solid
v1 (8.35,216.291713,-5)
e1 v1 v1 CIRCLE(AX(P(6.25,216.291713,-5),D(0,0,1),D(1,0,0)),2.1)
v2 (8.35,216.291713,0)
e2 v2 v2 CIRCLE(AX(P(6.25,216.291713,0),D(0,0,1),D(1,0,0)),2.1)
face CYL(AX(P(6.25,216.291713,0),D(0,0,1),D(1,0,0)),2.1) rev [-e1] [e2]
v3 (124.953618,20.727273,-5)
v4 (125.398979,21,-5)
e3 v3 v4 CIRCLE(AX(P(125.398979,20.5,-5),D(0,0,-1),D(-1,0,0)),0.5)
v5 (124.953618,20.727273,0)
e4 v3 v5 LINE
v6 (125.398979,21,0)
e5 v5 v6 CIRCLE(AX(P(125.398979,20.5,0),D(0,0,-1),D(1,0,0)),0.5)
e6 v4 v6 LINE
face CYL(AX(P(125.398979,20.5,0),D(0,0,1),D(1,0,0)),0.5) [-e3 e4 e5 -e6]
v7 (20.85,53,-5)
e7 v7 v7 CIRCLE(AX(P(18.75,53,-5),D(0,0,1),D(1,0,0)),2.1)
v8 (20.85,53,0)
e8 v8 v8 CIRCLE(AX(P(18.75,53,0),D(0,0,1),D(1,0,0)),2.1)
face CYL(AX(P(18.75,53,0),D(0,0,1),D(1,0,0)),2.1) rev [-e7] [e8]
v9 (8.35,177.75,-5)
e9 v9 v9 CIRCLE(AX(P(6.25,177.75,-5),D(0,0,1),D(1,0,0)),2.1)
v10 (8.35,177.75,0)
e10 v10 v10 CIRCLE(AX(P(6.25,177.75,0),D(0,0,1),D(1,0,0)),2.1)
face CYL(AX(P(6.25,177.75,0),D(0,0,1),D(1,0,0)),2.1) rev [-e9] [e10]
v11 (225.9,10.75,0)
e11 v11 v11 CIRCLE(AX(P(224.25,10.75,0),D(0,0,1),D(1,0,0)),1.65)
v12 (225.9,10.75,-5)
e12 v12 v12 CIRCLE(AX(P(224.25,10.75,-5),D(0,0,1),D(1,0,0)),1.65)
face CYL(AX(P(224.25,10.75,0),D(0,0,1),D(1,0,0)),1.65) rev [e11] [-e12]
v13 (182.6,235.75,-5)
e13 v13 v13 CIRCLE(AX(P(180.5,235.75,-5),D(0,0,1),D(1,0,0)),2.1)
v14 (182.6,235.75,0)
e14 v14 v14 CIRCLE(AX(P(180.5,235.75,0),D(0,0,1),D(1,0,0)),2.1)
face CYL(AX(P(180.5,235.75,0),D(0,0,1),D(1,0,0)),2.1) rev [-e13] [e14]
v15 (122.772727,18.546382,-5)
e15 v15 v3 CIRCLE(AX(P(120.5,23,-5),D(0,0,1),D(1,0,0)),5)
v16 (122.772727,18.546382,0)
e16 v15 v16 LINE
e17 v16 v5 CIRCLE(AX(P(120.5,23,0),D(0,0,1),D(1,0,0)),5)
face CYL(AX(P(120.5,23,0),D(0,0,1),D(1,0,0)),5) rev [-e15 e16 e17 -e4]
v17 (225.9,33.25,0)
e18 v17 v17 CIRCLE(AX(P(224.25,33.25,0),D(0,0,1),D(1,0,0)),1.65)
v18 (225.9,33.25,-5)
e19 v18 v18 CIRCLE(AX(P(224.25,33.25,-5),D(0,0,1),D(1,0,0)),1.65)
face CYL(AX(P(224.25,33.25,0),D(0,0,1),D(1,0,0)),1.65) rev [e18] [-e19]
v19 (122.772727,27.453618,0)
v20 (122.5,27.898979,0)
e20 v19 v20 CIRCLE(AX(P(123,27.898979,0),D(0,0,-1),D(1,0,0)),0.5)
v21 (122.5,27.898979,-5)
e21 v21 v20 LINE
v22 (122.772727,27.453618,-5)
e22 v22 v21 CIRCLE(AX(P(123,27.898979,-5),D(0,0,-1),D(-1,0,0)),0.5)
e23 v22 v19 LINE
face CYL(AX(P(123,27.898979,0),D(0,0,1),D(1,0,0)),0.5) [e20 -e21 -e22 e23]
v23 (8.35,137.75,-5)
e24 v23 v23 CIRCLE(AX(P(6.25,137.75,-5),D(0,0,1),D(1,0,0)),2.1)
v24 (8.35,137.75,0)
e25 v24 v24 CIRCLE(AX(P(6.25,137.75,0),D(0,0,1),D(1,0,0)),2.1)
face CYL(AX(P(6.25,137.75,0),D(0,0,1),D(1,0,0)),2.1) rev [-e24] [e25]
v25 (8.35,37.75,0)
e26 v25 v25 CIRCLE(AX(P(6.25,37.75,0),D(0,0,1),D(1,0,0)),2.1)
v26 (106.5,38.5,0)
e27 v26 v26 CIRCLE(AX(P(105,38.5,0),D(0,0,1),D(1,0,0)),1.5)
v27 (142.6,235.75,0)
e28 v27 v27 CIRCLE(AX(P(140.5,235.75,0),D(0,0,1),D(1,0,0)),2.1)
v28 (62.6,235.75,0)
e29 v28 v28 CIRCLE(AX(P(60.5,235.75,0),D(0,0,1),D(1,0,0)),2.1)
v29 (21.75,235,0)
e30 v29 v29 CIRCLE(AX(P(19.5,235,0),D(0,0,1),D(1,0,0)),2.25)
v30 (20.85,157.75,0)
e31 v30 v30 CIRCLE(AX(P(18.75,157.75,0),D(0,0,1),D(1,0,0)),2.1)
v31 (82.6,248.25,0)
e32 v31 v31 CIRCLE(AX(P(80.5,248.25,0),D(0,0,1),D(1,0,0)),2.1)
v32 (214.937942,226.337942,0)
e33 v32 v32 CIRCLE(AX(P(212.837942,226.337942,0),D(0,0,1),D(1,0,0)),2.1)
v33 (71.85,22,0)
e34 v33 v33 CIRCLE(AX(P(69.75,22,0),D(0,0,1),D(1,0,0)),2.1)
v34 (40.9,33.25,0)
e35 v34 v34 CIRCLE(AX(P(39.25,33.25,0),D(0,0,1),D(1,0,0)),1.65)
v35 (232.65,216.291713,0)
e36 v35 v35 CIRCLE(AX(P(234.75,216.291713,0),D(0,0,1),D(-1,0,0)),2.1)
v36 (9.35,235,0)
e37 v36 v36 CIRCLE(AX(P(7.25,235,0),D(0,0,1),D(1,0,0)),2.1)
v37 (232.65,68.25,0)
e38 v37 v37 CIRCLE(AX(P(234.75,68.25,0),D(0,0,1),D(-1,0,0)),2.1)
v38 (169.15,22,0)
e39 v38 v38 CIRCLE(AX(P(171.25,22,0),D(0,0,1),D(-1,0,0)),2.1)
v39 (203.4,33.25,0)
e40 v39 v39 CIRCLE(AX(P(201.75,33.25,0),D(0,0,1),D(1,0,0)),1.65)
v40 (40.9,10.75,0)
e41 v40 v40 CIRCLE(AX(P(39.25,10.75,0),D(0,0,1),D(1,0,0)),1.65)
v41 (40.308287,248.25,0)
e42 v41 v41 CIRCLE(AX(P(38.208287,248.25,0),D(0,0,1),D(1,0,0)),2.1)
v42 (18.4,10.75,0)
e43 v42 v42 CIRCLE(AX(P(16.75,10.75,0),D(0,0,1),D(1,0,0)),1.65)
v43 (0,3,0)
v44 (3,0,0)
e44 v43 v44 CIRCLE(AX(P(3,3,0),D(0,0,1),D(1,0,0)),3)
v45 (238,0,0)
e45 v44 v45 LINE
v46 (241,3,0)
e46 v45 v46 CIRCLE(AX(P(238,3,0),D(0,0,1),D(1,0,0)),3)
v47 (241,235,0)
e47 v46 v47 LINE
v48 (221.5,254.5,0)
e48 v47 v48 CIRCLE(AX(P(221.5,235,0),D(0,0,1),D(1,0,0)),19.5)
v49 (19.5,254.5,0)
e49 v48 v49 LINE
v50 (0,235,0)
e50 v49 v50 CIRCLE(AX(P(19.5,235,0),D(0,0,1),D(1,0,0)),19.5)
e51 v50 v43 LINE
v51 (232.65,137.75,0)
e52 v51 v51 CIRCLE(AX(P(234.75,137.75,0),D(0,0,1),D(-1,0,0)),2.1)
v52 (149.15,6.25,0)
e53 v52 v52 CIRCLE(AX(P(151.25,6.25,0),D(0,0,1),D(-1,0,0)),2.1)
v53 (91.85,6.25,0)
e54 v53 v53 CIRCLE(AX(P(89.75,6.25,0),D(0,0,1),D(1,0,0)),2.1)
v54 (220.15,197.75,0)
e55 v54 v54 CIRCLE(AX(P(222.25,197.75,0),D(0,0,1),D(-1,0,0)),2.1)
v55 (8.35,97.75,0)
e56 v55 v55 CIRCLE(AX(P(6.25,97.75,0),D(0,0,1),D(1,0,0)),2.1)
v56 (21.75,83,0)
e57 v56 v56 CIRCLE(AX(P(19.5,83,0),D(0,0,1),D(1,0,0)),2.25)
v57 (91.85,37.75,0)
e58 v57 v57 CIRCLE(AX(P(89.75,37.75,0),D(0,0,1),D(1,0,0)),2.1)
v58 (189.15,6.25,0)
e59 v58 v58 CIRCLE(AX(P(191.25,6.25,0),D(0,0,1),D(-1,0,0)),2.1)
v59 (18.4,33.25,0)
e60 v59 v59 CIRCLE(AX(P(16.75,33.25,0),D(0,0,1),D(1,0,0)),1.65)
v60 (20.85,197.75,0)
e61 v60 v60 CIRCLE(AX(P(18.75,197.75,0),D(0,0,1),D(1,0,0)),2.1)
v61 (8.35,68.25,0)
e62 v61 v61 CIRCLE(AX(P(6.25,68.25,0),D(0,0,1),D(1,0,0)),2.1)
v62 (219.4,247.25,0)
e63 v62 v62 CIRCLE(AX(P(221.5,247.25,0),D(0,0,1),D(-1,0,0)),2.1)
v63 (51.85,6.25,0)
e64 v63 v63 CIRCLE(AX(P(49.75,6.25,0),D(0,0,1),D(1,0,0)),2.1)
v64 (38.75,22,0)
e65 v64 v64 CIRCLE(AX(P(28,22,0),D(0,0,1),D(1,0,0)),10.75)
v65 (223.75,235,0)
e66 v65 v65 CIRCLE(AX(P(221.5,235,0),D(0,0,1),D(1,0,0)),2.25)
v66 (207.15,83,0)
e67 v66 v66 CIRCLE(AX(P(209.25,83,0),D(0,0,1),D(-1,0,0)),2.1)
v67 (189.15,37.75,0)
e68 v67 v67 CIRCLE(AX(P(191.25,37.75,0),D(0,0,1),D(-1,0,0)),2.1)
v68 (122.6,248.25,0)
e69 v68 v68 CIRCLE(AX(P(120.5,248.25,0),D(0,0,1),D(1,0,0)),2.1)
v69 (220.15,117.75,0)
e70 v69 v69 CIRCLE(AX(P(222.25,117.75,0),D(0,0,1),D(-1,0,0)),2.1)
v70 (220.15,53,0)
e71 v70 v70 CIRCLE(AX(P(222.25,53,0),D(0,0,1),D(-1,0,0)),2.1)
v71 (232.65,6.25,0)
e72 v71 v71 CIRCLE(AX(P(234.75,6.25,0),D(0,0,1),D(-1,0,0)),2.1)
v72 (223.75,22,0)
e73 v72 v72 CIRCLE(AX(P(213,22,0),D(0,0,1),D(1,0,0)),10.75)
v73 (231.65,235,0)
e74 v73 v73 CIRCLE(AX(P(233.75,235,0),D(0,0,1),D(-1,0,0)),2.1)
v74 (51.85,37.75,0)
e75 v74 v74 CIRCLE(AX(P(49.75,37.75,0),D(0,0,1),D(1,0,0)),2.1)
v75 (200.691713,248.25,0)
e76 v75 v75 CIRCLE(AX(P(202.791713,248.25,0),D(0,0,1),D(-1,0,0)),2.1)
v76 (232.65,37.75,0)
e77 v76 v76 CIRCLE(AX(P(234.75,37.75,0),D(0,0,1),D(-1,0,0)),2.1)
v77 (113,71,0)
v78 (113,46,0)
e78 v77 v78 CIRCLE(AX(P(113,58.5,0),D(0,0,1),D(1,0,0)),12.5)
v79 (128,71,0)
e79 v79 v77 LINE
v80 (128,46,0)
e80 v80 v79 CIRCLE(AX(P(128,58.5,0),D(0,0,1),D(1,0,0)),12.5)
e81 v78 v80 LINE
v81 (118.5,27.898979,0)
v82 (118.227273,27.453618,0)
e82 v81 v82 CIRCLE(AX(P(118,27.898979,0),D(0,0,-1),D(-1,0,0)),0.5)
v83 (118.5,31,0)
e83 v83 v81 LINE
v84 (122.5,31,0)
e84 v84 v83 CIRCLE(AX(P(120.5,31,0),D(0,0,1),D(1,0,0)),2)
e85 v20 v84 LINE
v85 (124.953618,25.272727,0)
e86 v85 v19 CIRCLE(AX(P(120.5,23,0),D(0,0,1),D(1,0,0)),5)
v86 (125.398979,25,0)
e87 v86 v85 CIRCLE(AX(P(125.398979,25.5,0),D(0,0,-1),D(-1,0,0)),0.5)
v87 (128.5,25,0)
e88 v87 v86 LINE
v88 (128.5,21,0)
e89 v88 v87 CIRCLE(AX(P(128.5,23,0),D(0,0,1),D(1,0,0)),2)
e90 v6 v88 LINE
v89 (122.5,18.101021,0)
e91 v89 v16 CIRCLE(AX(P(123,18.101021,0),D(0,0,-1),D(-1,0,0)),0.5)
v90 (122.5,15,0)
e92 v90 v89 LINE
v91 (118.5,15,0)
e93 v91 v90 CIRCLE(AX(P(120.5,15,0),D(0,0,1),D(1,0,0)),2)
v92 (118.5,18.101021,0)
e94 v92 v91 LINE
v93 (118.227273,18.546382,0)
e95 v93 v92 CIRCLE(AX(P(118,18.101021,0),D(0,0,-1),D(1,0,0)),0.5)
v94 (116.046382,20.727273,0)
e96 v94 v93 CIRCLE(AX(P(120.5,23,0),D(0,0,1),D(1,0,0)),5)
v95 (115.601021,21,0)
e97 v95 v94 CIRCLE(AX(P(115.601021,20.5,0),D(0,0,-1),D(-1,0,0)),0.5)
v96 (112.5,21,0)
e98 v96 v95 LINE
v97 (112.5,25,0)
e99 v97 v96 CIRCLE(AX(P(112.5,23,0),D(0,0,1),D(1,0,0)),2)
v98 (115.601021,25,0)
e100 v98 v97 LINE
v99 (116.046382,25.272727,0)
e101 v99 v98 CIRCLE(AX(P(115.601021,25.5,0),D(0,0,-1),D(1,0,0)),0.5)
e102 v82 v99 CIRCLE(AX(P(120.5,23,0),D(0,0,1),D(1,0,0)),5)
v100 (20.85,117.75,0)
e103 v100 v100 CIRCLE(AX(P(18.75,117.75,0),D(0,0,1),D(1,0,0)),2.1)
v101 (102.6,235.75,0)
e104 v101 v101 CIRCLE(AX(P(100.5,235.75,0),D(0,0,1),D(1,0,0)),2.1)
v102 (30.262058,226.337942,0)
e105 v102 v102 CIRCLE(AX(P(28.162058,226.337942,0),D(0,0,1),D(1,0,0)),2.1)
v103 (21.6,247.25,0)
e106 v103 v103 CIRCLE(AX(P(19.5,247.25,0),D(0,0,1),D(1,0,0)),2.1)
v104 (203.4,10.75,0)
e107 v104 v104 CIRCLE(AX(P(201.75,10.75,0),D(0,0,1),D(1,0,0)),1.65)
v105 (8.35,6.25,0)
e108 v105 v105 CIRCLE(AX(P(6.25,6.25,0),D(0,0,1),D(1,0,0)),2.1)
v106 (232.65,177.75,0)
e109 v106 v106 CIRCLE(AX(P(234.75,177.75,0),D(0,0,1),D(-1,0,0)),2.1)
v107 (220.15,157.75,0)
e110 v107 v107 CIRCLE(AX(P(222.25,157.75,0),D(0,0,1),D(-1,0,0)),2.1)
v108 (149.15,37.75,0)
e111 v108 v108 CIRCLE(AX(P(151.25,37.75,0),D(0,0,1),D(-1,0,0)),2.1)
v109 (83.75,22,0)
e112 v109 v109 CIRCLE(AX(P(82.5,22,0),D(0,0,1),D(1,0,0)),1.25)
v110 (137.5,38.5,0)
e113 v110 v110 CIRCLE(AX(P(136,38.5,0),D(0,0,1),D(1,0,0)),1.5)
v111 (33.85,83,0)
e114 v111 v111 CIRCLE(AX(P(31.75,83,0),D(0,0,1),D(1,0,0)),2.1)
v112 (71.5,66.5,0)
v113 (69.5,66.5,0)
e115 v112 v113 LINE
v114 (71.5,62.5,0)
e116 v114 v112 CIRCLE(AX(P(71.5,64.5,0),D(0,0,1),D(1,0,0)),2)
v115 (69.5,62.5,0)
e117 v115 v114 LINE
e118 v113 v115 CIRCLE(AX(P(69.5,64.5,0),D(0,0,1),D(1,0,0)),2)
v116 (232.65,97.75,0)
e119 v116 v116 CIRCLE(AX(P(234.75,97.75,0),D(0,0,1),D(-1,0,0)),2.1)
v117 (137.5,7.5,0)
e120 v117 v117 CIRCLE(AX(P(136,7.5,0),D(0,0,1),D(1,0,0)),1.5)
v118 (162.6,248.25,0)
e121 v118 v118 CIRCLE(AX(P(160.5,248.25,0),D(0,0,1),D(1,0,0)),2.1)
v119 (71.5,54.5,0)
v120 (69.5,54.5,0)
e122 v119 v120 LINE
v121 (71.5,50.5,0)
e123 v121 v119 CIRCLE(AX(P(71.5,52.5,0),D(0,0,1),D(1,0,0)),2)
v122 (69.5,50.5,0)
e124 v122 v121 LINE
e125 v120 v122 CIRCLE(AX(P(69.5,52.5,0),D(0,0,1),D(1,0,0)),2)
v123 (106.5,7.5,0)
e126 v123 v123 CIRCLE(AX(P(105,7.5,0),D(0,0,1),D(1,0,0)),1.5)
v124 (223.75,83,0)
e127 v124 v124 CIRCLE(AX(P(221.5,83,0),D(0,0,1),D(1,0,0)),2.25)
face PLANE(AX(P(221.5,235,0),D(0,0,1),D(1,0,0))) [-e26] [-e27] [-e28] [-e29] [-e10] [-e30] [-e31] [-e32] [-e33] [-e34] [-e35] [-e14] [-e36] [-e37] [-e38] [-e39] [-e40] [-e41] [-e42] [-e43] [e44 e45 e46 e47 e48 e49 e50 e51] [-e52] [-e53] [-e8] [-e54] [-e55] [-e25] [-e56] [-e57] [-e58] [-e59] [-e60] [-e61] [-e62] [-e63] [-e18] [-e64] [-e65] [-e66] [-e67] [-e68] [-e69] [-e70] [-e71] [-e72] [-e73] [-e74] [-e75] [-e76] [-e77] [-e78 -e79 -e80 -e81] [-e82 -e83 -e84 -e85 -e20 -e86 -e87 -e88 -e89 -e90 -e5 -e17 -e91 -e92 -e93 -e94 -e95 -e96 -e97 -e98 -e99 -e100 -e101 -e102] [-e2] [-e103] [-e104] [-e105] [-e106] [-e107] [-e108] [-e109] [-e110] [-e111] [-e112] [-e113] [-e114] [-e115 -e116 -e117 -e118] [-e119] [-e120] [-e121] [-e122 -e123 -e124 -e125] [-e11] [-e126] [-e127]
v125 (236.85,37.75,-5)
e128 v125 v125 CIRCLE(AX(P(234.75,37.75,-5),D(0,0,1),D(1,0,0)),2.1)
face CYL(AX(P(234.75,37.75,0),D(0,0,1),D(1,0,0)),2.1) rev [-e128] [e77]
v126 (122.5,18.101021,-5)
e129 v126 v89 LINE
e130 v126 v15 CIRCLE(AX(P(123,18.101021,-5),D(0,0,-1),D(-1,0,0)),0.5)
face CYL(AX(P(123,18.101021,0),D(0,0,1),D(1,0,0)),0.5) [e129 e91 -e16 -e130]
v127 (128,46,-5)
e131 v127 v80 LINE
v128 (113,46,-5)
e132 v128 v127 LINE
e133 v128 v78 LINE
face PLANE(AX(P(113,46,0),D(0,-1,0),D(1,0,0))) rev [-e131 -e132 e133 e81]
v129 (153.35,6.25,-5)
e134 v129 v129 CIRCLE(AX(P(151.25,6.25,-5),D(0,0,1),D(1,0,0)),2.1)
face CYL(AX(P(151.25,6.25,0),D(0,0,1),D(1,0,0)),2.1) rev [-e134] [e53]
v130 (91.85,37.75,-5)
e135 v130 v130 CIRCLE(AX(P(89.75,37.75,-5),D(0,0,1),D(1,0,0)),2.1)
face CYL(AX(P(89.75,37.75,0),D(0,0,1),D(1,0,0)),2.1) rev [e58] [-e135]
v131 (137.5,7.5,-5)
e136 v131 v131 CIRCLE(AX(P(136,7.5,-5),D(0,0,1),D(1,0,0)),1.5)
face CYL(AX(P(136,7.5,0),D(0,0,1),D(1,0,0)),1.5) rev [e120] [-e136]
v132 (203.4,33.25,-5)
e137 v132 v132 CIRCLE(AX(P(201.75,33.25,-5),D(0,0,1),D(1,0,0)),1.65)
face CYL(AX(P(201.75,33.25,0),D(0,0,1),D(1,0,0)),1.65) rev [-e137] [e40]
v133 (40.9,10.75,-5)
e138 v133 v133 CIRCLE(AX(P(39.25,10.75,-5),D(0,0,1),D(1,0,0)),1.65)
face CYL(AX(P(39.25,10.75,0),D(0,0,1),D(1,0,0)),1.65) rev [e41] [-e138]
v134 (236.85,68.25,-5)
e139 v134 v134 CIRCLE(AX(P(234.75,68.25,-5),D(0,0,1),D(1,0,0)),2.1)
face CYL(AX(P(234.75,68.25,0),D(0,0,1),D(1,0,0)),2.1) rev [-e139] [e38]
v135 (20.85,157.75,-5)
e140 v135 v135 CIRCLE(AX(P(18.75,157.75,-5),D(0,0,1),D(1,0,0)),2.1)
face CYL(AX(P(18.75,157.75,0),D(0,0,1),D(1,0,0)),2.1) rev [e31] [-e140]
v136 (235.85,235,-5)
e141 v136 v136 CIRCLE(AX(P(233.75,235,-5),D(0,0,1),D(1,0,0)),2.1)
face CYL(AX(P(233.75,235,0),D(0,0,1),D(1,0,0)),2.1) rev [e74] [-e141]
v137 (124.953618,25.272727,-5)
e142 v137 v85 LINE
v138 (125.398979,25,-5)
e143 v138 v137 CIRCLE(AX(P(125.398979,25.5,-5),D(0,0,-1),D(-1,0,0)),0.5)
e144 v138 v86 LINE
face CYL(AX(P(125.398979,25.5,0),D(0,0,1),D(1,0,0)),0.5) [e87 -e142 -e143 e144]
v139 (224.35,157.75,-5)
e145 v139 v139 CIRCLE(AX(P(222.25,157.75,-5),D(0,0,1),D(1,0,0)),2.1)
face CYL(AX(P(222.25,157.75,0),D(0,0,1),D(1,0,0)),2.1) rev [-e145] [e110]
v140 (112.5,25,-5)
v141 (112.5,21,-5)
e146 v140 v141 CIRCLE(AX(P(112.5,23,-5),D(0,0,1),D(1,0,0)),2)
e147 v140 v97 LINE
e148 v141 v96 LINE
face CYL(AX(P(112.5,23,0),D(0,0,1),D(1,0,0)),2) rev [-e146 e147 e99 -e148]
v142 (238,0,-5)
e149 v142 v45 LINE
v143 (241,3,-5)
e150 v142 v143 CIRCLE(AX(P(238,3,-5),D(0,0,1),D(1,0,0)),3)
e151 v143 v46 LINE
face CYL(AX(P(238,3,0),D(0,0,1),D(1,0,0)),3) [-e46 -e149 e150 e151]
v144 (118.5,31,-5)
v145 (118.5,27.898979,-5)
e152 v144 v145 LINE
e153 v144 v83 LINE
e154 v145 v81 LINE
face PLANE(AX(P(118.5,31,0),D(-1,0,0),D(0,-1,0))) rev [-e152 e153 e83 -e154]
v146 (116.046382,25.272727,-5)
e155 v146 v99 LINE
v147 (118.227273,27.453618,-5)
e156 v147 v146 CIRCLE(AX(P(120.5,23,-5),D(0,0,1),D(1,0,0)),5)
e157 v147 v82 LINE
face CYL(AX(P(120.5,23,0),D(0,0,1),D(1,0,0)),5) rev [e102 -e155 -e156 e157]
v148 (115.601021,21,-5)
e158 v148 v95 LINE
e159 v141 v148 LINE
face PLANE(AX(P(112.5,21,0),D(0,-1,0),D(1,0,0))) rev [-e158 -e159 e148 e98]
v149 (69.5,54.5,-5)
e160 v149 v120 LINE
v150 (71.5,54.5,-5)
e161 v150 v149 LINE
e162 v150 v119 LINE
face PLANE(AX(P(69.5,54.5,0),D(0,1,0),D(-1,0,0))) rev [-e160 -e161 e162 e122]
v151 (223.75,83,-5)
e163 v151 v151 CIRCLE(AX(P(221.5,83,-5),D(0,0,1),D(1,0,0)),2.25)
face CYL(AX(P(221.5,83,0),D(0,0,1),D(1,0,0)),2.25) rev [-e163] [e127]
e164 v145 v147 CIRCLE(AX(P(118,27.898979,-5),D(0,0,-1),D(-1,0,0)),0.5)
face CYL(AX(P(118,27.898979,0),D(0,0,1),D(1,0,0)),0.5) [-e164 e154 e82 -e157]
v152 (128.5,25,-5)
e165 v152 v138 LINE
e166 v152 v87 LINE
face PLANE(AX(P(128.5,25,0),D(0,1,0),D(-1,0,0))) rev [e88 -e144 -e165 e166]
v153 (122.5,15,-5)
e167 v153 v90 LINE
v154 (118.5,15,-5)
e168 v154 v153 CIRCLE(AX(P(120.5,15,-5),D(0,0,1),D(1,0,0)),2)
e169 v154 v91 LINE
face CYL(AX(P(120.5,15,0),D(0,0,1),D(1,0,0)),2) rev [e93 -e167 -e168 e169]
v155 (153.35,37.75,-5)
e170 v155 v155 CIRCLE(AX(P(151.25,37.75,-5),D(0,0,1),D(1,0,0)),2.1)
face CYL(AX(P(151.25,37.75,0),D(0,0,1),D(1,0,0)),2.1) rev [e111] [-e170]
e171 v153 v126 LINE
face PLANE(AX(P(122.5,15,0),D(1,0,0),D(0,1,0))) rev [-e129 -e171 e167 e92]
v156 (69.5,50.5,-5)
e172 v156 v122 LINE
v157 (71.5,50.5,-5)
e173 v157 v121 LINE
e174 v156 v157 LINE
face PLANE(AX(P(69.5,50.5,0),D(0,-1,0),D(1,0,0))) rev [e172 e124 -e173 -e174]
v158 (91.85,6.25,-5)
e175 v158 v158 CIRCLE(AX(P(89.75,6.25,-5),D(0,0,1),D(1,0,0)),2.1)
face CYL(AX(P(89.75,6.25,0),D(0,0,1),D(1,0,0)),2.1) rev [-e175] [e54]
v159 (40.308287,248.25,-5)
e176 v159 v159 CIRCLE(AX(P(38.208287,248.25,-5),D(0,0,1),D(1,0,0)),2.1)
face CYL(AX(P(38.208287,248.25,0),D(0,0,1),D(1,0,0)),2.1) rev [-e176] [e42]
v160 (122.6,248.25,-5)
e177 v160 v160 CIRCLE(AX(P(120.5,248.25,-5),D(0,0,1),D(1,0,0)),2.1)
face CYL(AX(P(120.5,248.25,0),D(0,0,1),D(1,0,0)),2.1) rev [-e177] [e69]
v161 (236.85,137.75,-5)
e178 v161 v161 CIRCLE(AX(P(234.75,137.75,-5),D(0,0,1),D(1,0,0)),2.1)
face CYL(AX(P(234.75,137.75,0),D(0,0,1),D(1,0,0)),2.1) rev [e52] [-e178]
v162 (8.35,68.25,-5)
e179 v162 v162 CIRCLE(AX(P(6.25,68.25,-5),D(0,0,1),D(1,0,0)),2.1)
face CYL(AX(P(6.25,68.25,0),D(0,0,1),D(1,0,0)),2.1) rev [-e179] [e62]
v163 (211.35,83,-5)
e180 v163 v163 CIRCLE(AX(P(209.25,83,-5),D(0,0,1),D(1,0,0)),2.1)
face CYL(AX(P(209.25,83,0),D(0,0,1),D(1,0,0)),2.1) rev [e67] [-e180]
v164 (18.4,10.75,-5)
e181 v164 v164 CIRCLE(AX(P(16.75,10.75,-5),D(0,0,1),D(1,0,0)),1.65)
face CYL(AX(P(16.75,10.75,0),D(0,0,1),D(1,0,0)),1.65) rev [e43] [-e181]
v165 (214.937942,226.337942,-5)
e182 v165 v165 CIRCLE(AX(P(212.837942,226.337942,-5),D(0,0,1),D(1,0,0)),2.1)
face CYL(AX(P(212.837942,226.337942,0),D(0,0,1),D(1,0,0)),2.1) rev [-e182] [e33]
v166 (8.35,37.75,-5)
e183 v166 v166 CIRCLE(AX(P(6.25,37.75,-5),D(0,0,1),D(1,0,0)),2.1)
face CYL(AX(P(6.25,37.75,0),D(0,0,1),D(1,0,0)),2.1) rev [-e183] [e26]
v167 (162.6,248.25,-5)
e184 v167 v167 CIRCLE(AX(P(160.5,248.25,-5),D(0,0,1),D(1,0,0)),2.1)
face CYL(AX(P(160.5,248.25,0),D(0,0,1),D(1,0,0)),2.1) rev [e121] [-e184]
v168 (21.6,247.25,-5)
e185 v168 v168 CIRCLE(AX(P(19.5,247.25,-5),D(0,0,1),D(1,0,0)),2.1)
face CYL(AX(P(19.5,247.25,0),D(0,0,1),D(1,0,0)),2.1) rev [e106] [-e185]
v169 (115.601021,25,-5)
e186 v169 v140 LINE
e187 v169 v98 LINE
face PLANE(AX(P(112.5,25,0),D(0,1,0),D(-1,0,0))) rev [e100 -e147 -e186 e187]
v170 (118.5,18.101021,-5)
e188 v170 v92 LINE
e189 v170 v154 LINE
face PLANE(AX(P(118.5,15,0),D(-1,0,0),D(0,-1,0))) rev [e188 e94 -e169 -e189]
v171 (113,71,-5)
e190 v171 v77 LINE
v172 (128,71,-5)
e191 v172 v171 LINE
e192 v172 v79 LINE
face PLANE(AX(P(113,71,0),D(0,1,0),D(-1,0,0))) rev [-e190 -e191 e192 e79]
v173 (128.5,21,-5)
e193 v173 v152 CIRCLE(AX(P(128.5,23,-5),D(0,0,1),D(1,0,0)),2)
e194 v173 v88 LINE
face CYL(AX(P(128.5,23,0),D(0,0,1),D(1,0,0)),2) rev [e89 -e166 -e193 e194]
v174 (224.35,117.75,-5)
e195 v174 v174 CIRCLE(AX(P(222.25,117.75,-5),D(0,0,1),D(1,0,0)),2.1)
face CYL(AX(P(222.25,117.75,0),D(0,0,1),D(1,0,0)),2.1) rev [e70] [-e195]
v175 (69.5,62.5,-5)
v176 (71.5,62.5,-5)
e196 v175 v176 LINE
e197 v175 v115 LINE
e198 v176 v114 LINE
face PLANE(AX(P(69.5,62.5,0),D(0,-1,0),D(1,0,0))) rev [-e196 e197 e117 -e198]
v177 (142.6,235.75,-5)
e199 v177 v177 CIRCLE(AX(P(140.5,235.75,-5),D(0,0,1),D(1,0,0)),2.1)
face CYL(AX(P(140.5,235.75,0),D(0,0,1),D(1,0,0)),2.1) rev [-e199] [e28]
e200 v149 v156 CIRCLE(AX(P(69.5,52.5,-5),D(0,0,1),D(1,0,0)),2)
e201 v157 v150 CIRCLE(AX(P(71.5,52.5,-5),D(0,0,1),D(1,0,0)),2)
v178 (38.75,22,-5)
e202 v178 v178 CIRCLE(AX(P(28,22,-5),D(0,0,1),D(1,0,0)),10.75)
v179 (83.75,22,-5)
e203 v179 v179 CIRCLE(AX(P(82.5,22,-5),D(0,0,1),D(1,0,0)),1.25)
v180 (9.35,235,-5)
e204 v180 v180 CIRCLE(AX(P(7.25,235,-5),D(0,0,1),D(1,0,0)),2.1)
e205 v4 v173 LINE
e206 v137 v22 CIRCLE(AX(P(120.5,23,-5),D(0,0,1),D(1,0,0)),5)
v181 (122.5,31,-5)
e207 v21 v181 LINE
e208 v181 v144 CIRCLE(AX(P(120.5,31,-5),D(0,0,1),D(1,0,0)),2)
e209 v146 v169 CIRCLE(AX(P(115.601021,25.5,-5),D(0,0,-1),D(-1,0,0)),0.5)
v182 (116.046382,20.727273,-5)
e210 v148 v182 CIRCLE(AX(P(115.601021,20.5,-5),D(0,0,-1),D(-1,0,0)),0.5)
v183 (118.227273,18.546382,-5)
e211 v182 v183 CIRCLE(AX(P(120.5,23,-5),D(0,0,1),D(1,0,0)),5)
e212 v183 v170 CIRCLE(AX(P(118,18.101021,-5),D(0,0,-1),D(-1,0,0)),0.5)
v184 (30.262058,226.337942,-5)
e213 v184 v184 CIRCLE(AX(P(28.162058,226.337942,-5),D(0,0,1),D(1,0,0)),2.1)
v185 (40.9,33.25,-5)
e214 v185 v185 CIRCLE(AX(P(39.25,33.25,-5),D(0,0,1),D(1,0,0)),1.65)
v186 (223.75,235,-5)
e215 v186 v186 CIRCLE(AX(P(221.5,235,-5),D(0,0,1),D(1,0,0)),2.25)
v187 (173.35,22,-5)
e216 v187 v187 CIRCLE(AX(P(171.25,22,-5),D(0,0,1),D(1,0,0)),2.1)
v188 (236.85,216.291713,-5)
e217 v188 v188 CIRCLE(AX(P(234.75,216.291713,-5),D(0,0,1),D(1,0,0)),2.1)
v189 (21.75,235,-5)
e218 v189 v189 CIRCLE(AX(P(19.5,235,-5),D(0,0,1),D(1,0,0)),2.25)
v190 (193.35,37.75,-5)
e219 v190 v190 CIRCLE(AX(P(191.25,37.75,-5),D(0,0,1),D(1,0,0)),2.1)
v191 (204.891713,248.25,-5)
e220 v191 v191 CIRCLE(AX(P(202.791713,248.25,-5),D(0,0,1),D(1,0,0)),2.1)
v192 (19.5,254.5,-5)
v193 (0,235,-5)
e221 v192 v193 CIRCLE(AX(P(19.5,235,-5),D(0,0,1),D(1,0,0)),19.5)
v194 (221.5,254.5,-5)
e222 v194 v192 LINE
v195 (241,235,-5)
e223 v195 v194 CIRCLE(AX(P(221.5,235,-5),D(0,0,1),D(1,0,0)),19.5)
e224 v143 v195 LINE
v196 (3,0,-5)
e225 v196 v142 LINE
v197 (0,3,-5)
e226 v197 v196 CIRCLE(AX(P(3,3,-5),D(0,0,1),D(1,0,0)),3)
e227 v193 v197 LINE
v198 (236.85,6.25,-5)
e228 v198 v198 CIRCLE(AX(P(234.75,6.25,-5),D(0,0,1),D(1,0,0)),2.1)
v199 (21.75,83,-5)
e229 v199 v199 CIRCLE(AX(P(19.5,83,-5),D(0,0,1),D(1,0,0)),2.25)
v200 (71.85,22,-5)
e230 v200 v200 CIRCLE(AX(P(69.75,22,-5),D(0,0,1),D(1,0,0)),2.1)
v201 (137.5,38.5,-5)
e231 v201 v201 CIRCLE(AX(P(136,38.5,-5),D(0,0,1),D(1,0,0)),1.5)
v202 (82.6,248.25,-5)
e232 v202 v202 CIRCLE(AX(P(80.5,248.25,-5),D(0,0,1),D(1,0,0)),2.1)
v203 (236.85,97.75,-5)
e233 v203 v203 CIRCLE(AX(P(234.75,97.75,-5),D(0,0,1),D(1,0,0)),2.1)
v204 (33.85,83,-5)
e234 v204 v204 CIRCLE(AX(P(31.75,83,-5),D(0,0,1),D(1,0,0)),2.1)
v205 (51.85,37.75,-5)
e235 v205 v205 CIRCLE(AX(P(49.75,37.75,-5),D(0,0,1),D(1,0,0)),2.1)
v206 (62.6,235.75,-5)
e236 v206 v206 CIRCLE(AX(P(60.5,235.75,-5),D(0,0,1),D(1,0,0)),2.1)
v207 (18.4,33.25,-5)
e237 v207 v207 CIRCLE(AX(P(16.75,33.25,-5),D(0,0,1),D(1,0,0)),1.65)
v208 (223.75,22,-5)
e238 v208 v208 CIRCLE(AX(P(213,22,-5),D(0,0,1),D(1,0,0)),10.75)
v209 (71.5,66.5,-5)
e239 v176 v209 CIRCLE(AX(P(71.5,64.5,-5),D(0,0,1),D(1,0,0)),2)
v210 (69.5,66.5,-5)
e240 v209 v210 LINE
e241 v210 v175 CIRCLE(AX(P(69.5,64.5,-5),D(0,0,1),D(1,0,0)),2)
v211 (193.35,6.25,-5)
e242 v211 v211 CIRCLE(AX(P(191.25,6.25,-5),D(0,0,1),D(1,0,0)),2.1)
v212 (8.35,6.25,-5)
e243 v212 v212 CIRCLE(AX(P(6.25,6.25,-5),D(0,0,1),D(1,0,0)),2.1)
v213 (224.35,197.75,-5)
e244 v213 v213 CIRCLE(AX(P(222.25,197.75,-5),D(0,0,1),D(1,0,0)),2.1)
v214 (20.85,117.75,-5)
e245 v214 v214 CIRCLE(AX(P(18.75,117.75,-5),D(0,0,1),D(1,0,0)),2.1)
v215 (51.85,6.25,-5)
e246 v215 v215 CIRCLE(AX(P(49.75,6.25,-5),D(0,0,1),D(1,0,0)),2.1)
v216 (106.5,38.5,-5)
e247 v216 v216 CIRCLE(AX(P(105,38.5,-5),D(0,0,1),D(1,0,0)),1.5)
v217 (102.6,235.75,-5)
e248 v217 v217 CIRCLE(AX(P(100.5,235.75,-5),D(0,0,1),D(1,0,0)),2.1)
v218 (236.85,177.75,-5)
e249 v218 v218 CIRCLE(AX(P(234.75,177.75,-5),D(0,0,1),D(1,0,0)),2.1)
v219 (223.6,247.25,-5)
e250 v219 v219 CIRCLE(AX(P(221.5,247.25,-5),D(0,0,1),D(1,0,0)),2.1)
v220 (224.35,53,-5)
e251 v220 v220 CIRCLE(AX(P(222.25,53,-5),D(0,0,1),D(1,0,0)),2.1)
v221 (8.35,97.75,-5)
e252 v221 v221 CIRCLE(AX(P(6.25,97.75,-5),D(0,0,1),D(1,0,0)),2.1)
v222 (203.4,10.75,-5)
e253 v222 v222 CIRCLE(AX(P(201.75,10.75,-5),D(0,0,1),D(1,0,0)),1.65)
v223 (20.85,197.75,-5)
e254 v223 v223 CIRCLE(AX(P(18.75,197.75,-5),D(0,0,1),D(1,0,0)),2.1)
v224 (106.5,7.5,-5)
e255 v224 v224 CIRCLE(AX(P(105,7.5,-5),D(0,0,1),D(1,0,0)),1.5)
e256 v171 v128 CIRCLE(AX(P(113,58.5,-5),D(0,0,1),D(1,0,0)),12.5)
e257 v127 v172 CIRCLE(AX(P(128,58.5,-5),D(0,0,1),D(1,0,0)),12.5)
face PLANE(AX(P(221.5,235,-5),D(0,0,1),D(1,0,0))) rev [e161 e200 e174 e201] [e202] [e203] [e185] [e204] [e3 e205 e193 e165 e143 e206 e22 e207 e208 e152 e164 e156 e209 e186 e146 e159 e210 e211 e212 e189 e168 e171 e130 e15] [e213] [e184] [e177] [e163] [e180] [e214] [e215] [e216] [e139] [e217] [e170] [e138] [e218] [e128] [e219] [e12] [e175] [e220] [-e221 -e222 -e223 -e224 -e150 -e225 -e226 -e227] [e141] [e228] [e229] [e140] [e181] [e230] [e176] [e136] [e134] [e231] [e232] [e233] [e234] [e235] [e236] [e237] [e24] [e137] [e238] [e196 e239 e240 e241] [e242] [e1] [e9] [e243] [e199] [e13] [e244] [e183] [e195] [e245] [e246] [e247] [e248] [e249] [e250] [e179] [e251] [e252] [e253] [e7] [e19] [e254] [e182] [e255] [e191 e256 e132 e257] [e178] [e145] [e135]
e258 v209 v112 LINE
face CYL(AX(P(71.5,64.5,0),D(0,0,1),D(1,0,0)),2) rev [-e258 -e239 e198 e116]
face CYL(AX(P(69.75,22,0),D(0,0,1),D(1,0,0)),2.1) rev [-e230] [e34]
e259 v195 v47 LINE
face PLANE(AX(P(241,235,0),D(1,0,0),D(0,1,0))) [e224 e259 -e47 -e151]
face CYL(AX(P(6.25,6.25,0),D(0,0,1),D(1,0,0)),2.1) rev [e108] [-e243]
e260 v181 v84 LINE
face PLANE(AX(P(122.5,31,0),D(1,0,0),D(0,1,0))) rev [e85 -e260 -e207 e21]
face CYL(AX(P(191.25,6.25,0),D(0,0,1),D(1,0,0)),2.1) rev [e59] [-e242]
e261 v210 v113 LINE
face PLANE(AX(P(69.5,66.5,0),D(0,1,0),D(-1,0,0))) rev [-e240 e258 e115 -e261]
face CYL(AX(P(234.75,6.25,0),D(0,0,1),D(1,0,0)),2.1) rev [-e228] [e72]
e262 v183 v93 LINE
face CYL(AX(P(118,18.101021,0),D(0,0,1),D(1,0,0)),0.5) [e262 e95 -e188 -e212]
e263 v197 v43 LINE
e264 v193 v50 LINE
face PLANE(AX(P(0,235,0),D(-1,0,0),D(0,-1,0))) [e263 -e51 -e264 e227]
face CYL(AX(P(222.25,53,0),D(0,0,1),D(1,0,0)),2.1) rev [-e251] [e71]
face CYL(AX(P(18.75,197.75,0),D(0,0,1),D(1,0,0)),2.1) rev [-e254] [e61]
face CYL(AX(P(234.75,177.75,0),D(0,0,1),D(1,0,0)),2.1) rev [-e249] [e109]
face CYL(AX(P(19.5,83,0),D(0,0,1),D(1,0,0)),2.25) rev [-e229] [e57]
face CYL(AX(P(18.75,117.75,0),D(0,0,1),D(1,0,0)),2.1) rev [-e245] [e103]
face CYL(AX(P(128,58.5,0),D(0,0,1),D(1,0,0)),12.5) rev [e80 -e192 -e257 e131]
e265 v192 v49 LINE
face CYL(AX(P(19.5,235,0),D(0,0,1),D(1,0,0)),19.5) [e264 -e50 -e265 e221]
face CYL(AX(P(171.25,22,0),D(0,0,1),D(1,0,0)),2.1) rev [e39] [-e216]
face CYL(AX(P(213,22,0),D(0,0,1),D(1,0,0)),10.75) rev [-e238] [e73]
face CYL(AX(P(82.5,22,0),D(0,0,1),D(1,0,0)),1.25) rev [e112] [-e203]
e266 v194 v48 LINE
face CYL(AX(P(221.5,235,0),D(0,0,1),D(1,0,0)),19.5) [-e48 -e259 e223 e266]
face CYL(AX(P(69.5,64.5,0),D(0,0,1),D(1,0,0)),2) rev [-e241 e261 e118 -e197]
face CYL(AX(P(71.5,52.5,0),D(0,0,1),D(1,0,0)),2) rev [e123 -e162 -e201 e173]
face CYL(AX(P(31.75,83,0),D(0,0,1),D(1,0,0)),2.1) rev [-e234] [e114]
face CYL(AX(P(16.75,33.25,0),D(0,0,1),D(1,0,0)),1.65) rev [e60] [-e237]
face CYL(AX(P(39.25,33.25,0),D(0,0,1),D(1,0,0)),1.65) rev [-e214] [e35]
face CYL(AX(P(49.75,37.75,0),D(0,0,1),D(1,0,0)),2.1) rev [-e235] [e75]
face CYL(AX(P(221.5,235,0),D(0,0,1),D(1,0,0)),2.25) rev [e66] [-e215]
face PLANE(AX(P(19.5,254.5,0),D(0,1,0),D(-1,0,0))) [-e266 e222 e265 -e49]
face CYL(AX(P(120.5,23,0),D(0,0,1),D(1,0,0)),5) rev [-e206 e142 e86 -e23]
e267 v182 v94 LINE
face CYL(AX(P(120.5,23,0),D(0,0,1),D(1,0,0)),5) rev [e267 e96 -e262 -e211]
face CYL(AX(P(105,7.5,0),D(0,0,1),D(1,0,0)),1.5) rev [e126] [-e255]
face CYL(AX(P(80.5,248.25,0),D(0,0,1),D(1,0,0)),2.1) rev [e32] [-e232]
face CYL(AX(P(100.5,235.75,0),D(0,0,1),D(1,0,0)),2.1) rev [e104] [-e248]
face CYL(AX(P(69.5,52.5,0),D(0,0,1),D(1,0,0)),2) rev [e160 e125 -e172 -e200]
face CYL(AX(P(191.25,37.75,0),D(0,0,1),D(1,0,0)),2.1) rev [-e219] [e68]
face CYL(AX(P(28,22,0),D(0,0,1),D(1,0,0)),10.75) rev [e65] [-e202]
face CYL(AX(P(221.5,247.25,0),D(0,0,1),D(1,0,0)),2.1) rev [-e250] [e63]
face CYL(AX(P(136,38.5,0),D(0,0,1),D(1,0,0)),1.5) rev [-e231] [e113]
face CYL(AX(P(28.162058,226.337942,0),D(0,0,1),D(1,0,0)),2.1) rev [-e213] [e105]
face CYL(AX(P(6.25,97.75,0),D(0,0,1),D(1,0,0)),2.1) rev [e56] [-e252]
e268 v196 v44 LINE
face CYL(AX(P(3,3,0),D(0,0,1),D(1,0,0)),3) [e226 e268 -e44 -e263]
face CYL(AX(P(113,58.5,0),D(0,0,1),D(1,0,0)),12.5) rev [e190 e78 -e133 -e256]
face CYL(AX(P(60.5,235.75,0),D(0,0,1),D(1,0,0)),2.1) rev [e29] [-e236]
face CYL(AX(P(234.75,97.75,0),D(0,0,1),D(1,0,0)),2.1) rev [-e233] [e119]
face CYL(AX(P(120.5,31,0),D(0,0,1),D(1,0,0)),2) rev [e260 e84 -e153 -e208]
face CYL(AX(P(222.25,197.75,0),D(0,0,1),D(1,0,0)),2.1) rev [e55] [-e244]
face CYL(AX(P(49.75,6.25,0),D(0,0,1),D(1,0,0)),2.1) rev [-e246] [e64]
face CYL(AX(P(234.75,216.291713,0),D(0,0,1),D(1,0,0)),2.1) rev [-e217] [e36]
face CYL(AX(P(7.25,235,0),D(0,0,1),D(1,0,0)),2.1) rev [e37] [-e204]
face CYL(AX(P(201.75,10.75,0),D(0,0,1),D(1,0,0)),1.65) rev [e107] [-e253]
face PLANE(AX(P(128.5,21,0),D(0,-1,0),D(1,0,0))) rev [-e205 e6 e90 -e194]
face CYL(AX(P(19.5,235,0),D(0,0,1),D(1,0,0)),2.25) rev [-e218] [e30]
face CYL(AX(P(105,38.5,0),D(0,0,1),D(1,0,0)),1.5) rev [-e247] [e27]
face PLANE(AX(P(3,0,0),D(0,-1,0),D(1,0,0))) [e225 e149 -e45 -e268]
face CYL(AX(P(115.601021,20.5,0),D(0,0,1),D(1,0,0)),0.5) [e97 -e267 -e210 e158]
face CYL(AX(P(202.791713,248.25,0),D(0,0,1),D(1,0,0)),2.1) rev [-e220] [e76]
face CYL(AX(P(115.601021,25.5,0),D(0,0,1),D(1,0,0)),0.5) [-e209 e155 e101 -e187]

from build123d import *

# Parameters (mm, degrees)
CONVERT_SOLID1_START       = -5
CONVERT_SOLID1_OUTLINE_R   = 2.1
CONVERT_SOLID1_OUTLINE_R_2 = 1.65
CONVERT_SOLID1_OUTLINE_R_3 = 10.75
CONVERT_SOLID1_OUTLINE_R_4 = 1.25
CONVERT_SOLID1_OUTLINE_R_5 = 1.5
CONVERT_SOLID1_OUTLINE_R_6 = 2.25
CONVERT_SOLID1_DEPTH       = 5


# Read off the part's stored shape, not the designer's step: Convert-Solid1
with BuildPart() as part:
    # Convert-Solid1 outline → Convert-Solid1 (new body)
    with BuildSketch(Plane.XY.offset(CONVERT_SOLID1_START)):
        with BuildLine():
            Line((221.5, 254.5), (19.5, 254.5))
            ThreePointArc((19.5, 254.5), (5.711417767, 248.788582233), (0, 235))
            Line((0, 235), (0, 3))
            ThreePointArc((0, 3), (0.878679656, 0.878679656), (3, 0))
            Line((3, 0), (238, 0))
            ThreePointArc((238, 0), (240.121320344, 0.878679656), (241, 3))
            Line((241, 3), (241, 235))
            ThreePointArc((241, 235), (235.288582233, 248.788582233), (221.5, 254.5))
        make_face()
        with Locations((6.25, 6.25)):
            Circle(CONVERT_SOLID1_OUTLINE_R, mode=Mode.SUBTRACT)
        with Locations((16.75, 10.75)):
            Circle(CONVERT_SOLID1_OUTLINE_R_2, mode=Mode.SUBTRACT)
        with Locations((28, 22)):
            Circle(CONVERT_SOLID1_OUTLINE_R_3, mode=Mode.SUBTRACT)
        with Locations((39.25, 10.75)):
            Circle(CONVERT_SOLID1_OUTLINE_R_2, mode=Mode.SUBTRACT)
        with Locations((49.75, 6.25)):
            Circle(CONVERT_SOLID1_OUTLINE_R, mode=Mode.SUBTRACT)
        with Locations((6.25, 37.75)):
            Circle(CONVERT_SOLID1_OUTLINE_R, mode=Mode.SUBTRACT)
        with Locations((16.75, 33.25)):
            Circle(CONVERT_SOLID1_OUTLINE_R_2, mode=Mode.SUBTRACT)
        with Locations((18.75, 53)):
            Circle(CONVERT_SOLID1_OUTLINE_R, mode=Mode.SUBTRACT)
        with Locations((39.25, 33.25)):
            Circle(CONVERT_SOLID1_OUTLINE_R_2, mode=Mode.SUBTRACT)
        with Locations((49.75, 37.75)):
            Circle(CONVERT_SOLID1_OUTLINE_R, mode=Mode.SUBTRACT)
        with Locations((89.75, 6.25)):
            Circle(CONVERT_SOLID1_OUTLINE_R, mode=Mode.SUBTRACT)
        with Locations((69.75, 22)):
            Circle(CONVERT_SOLID1_OUTLINE_R, mode=Mode.SUBTRACT)
        with Locations((82.5, 22)):
            Circle(CONVERT_SOLID1_OUTLINE_R_4, mode=Mode.SUBTRACT)
        with Locations((105, 7.5)):
            Circle(CONVERT_SOLID1_OUTLINE_R_5, mode=Mode.SUBTRACT)
        with Locations((89.75, 37.75)):
            Circle(CONVERT_SOLID1_OUTLINE_R, mode=Mode.SUBTRACT)
        with BuildLine():
            ThreePointArc((71.5, 54.5), (73.5, 52.5), (71.5, 50.5))
            Line((71.5, 50.5), (69.5, 50.5))
            ThreePointArc((69.5, 50.5), (67.5, 52.5), (69.5, 54.5))
            Line((69.5, 54.5), (71.5, 54.5))
        make_face(mode=Mode.SUBTRACT)
        with Locations((105, 38.5)):
            Circle(CONVERT_SOLID1_OUTLINE_R_5, mode=Mode.SUBTRACT)
        with Locations((6.25, 68.25)):
            Circle(CONVERT_SOLID1_OUTLINE_R, mode=Mode.SUBTRACT)
        with Locations((19.5, 83)):
            Circle(CONVERT_SOLID1_OUTLINE_R_6, mode=Mode.SUBTRACT)
        with Locations((31.75, 83)):
            Circle(CONVERT_SOLID1_OUTLINE_R, mode=Mode.SUBTRACT)
        with Locations((6.25, 97.75)):
            Circle(CONVERT_SOLID1_OUTLINE_R, mode=Mode.SUBTRACT)
        with Locations((18.75, 117.75)):
            Circle(CONVERT_SOLID1_OUTLINE_R, mode=Mode.SUBTRACT)
        with BuildLine():
            ThreePointArc((71.5, 66.5), (73.5, 64.5), (71.5, 62.5))
            Line((71.5, 62.5), (69.5, 62.5))
            ThreePointArc((69.5, 62.5), (67.5, 64.5), (69.5, 66.5))
            Line((69.5, 66.5), (71.5, 66.5))
        make_face(mode=Mode.SUBTRACT)
        with Locations((136, 7.5)):
            Circle(CONVERT_SOLID1_OUTLINE_R_5, mode=Mode.SUBTRACT)
        with BuildLine():
            ThreePointArc((122.5, 15), (120.5, 13), (118.5, 15))
            Line((118.5, 15), (118.5, 18.101020514))
            ThreePointArc((118.5, 18.101020514), (118.426401433, 18.362136998), (118.227272727, 18.546382286))
            ThreePointArc((118.227272727, 18.546382286), (116.964466094, 19.464466094), (116.046382286, 20.727272727))
            ThreePointArc((116.046382286, 20.727272727), (115.862136998, 20.926401433), (115.601020514, 21))
            Line((115.601020514, 21), (112.5, 21))
            ThreePointArc((112.5, 21), (110.5, 23), (112.5, 25))
            Line((112.5, 25), (115.601020514, 25))
            ThreePointArc((115.601020514, 25), (115.862136998, 25.073598567), (116.046382286, 25.272727273))
            ThreePointArc((116.046382286, 25.272727273), (116.964466093, 26.535533904), (118.227272723, 27.453617712))
            ThreePointArc((118.227272723, 27.453617712), (118.426401429, 27.637862999), (118.499999996, 27.898979483))
            Line((118.499999996, 27.898979483), (118.499999996, 31.000000005))
            ThreePointArc((118.499999996, 31.000000005), (120.5, 33.00000001), (122.500000004, 31.000000005))
            Line((122.500000004, 31.000000005), (122.500000004, 27.898979483))
            ThreePointArc((122.500000004, 27.898979483), (122.573598571, 27.637862999), (122.772727277, 27.453617712))
            ThreePointArc((122.772727277, 27.453617712), (124.035533907, 26.535533904), (124.953617714, 25.272727273))
            ThreePointArc((124.953617714, 25.272727273), (125.137863002, 25.073598567), (125.398979486, 25))
            Line((125.398979486, 25), (128.5, 25))
            ThreePointArc((128.5, 25), (130.5, 23), (128.5, 21))
            Line((128.5, 21), (125.398979486, 21))
            ThreePointArc((125.398979486, 21), (125.137863002, 20.926401433), (124.953617714, 20.727272727))
            ThreePointArc((124.953617714, 20.727272727), (124.035533906, 19.464466094), (122.772727273, 18.546382286))
            ThreePointArc((122.772727273, 18.546382286), (122.573598567, 18.362136998), (122.5, 18.101020514))
            Line((122.5, 18.101020514), (122.5, 15))
        make_face(mode=Mode.SUBTRACT)
        with Locations((151.25, 6.25)):
            Circle(CONVERT_SOLID1_OUTLINE_R, mode=Mode.SUBTRACT)
        with Locations((171.25, 22)):
            Circle(CONVERT_SOLID1_OUTLINE_R, mode=Mode.SUBTRACT)
        with Locations((136, 38.5)):
            Circle(CONVERT_SOLID1_OUTLINE_R_5, mode=Mode.SUBTRACT)
        with BuildLine():
            ThreePointArc((128, 71), (140.5, 58.5), (128, 46))
            Line((128, 46), (113, 46))
            ThreePointArc((113, 46), (100.5, 58.5), (113, 71))
            Line((113, 71), (128, 71))
        make_face(mode=Mode.SUBTRACT)
        with Locations((151.25, 37.75)):
            Circle(CONVERT_SOLID1_OUTLINE_R, mode=Mode.SUBTRACT)
        with Locations((191.25, 6.25)):
            Circle(CONVERT_SOLID1_OUTLINE_R, mode=Mode.SUBTRACT)
        with Locations((201.75, 10.75)):
            Circle(CONVERT_SOLID1_OUTLINE_R_2, mode=Mode.SUBTRACT)
        with Locations((224.25, 10.75)):
            Circle(CONVERT_SOLID1_OUTLINE_R_2, mode=Mode.SUBTRACT)
        with Locations((234.75, 6.25)):
            Circle(CONVERT_SOLID1_OUTLINE_R, mode=Mode.SUBTRACT)
        with Locations((213, 22)):
            Circle(CONVERT_SOLID1_OUTLINE_R_3, mode=Mode.SUBTRACT)
        with Locations((191.25, 37.75)):
            Circle(CONVERT_SOLID1_OUTLINE_R, mode=Mode.SUBTRACT)
        with Locations((201.75, 33.25)):
            Circle(CONVERT_SOLID1_OUTLINE_R_2, mode=Mode.SUBTRACT)
        with Locations((224.25, 33.25)):
            Circle(CONVERT_SOLID1_OUTLINE_R_2, mode=Mode.SUBTRACT)
        with Locations((234.75, 37.75)):
            Circle(CONVERT_SOLID1_OUTLINE_R, mode=Mode.SUBTRACT)
        with Locations((222.25, 53)):
            Circle(CONVERT_SOLID1_OUTLINE_R, mode=Mode.SUBTRACT)
        with Locations((209.25, 83)):
            Circle(CONVERT_SOLID1_OUTLINE_R, mode=Mode.SUBTRACT)
        with Locations((234.75, 68.25)):
            Circle(CONVERT_SOLID1_OUTLINE_R, mode=Mode.SUBTRACT)
        with Locations((221.5, 83)):
            Circle(CONVERT_SOLID1_OUTLINE_R_6, mode=Mode.SUBTRACT)
        with Locations((234.75, 97.75)):
            Circle(CONVERT_SOLID1_OUTLINE_R, mode=Mode.SUBTRACT)
        with Locations((222.25, 117.75)):
            Circle(CONVERT_SOLID1_OUTLINE_R, mode=Mode.SUBTRACT)
        with Locations((6.25, 137.75)):
            Circle(CONVERT_SOLID1_OUTLINE_R, mode=Mode.SUBTRACT)
        with Locations((18.75, 157.75)):
            Circle(CONVERT_SOLID1_OUTLINE_R, mode=Mode.SUBTRACT)
        with Locations((6.25, 177.75)):
            Circle(CONVERT_SOLID1_OUTLINE_R, mode=Mode.SUBTRACT)
        with Locations((18.75, 197.75)):
            Circle(CONVERT_SOLID1_OUTLINE_R, mode=Mode.SUBTRACT)
        with Locations((6.25, 216.291713066)):
            Circle(CONVERT_SOLID1_OUTLINE_R, mode=Mode.SUBTRACT)
        with Locations((7.25, 235)):
            Circle(CONVERT_SOLID1_OUTLINE_R, mode=Mode.SUBTRACT)
        with Locations((28.16205807, 226.33794193)):
            Circle(CONVERT_SOLID1_OUTLINE_R, mode=Mode.SUBTRACT)
        with Locations((19.5, 235)):
            Circle(CONVERT_SOLID1_OUTLINE_R_6, mode=Mode.SUBTRACT)
        with Locations((19.5, 247.25)):
            Circle(CONVERT_SOLID1_OUTLINE_R, mode=Mode.SUBTRACT)
        with Locations((38.208286934, 248.25)):
            Circle(CONVERT_SOLID1_OUTLINE_R, mode=Mode.SUBTRACT)
        with Locations((60.5, 235.75)):
            Circle(CONVERT_SOLID1_OUTLINE_R, mode=Mode.SUBTRACT)
        with Locations((80.5, 248.25)):
            Circle(CONVERT_SOLID1_OUTLINE_R, mode=Mode.SUBTRACT)
        with Locations((100.5, 235.75)):
            Circle(CONVERT_SOLID1_OUTLINE_R, mode=Mode.SUBTRACT)
        with Locations((234.75, 137.75)):
            Circle(CONVERT_SOLID1_OUTLINE_R, mode=Mode.SUBTRACT)
        with Locations((222.25, 157.75)):
            Circle(CONVERT_SOLID1_OUTLINE_R, mode=Mode.SUBTRACT)
        with Locations((234.75, 177.75)):
            Circle(CONVERT_SOLID1_OUTLINE_R, mode=Mode.SUBTRACT)
        with Locations((140.5, 235.75)):
            Circle(CONVERT_SOLID1_OUTLINE_R, mode=Mode.SUBTRACT)
        with Locations((120.5, 248.25)):
            Circle(CONVERT_SOLID1_OUTLINE_R, mode=Mode.SUBTRACT)
        with Locations((180.5, 235.75)):
            Circle(CONVERT_SOLID1_OUTLINE_R, mode=Mode.SUBTRACT)
        with Locations((160.5, 248.25)):
            Circle(CONVERT_SOLID1_OUTLINE_R, mode=Mode.SUBTRACT)
        with Locations((222.25, 197.75)):
            Circle(CONVERT_SOLID1_OUTLINE_R, mode=Mode.SUBTRACT)
        with Locations((234.75, 216.291713066)):
            Circle(CONVERT_SOLID1_OUTLINE_R, mode=Mode.SUBTRACT)
        with Locations((202.791713066, 248.25)):
            Circle(CONVERT_SOLID1_OUTLINE_R, mode=Mode.SUBTRACT)
        with Locations((212.83794193, 226.33794193)):
            Circle(CONVERT_SOLID1_OUTLINE_R, mode=Mode.SUBTRACT)
        with Locations((221.5, 235)):
            Circle(CONVERT_SOLID1_OUTLINE_R_6, mode=Mode.SUBTRACT)
        with Locations((233.75, 235)):
            Circle(CONVERT_SOLID1_OUTLINE_R, mode=Mode.SUBTRACT)
        with Locations((221.5, 247.25)):
            Circle(CONVERT_SOLID1_OUTLINE_R, mode=Mode.SUBTRACT)
    extrude(amount=CONVERT_SOLID1_DEPTH)


solid = part.part
